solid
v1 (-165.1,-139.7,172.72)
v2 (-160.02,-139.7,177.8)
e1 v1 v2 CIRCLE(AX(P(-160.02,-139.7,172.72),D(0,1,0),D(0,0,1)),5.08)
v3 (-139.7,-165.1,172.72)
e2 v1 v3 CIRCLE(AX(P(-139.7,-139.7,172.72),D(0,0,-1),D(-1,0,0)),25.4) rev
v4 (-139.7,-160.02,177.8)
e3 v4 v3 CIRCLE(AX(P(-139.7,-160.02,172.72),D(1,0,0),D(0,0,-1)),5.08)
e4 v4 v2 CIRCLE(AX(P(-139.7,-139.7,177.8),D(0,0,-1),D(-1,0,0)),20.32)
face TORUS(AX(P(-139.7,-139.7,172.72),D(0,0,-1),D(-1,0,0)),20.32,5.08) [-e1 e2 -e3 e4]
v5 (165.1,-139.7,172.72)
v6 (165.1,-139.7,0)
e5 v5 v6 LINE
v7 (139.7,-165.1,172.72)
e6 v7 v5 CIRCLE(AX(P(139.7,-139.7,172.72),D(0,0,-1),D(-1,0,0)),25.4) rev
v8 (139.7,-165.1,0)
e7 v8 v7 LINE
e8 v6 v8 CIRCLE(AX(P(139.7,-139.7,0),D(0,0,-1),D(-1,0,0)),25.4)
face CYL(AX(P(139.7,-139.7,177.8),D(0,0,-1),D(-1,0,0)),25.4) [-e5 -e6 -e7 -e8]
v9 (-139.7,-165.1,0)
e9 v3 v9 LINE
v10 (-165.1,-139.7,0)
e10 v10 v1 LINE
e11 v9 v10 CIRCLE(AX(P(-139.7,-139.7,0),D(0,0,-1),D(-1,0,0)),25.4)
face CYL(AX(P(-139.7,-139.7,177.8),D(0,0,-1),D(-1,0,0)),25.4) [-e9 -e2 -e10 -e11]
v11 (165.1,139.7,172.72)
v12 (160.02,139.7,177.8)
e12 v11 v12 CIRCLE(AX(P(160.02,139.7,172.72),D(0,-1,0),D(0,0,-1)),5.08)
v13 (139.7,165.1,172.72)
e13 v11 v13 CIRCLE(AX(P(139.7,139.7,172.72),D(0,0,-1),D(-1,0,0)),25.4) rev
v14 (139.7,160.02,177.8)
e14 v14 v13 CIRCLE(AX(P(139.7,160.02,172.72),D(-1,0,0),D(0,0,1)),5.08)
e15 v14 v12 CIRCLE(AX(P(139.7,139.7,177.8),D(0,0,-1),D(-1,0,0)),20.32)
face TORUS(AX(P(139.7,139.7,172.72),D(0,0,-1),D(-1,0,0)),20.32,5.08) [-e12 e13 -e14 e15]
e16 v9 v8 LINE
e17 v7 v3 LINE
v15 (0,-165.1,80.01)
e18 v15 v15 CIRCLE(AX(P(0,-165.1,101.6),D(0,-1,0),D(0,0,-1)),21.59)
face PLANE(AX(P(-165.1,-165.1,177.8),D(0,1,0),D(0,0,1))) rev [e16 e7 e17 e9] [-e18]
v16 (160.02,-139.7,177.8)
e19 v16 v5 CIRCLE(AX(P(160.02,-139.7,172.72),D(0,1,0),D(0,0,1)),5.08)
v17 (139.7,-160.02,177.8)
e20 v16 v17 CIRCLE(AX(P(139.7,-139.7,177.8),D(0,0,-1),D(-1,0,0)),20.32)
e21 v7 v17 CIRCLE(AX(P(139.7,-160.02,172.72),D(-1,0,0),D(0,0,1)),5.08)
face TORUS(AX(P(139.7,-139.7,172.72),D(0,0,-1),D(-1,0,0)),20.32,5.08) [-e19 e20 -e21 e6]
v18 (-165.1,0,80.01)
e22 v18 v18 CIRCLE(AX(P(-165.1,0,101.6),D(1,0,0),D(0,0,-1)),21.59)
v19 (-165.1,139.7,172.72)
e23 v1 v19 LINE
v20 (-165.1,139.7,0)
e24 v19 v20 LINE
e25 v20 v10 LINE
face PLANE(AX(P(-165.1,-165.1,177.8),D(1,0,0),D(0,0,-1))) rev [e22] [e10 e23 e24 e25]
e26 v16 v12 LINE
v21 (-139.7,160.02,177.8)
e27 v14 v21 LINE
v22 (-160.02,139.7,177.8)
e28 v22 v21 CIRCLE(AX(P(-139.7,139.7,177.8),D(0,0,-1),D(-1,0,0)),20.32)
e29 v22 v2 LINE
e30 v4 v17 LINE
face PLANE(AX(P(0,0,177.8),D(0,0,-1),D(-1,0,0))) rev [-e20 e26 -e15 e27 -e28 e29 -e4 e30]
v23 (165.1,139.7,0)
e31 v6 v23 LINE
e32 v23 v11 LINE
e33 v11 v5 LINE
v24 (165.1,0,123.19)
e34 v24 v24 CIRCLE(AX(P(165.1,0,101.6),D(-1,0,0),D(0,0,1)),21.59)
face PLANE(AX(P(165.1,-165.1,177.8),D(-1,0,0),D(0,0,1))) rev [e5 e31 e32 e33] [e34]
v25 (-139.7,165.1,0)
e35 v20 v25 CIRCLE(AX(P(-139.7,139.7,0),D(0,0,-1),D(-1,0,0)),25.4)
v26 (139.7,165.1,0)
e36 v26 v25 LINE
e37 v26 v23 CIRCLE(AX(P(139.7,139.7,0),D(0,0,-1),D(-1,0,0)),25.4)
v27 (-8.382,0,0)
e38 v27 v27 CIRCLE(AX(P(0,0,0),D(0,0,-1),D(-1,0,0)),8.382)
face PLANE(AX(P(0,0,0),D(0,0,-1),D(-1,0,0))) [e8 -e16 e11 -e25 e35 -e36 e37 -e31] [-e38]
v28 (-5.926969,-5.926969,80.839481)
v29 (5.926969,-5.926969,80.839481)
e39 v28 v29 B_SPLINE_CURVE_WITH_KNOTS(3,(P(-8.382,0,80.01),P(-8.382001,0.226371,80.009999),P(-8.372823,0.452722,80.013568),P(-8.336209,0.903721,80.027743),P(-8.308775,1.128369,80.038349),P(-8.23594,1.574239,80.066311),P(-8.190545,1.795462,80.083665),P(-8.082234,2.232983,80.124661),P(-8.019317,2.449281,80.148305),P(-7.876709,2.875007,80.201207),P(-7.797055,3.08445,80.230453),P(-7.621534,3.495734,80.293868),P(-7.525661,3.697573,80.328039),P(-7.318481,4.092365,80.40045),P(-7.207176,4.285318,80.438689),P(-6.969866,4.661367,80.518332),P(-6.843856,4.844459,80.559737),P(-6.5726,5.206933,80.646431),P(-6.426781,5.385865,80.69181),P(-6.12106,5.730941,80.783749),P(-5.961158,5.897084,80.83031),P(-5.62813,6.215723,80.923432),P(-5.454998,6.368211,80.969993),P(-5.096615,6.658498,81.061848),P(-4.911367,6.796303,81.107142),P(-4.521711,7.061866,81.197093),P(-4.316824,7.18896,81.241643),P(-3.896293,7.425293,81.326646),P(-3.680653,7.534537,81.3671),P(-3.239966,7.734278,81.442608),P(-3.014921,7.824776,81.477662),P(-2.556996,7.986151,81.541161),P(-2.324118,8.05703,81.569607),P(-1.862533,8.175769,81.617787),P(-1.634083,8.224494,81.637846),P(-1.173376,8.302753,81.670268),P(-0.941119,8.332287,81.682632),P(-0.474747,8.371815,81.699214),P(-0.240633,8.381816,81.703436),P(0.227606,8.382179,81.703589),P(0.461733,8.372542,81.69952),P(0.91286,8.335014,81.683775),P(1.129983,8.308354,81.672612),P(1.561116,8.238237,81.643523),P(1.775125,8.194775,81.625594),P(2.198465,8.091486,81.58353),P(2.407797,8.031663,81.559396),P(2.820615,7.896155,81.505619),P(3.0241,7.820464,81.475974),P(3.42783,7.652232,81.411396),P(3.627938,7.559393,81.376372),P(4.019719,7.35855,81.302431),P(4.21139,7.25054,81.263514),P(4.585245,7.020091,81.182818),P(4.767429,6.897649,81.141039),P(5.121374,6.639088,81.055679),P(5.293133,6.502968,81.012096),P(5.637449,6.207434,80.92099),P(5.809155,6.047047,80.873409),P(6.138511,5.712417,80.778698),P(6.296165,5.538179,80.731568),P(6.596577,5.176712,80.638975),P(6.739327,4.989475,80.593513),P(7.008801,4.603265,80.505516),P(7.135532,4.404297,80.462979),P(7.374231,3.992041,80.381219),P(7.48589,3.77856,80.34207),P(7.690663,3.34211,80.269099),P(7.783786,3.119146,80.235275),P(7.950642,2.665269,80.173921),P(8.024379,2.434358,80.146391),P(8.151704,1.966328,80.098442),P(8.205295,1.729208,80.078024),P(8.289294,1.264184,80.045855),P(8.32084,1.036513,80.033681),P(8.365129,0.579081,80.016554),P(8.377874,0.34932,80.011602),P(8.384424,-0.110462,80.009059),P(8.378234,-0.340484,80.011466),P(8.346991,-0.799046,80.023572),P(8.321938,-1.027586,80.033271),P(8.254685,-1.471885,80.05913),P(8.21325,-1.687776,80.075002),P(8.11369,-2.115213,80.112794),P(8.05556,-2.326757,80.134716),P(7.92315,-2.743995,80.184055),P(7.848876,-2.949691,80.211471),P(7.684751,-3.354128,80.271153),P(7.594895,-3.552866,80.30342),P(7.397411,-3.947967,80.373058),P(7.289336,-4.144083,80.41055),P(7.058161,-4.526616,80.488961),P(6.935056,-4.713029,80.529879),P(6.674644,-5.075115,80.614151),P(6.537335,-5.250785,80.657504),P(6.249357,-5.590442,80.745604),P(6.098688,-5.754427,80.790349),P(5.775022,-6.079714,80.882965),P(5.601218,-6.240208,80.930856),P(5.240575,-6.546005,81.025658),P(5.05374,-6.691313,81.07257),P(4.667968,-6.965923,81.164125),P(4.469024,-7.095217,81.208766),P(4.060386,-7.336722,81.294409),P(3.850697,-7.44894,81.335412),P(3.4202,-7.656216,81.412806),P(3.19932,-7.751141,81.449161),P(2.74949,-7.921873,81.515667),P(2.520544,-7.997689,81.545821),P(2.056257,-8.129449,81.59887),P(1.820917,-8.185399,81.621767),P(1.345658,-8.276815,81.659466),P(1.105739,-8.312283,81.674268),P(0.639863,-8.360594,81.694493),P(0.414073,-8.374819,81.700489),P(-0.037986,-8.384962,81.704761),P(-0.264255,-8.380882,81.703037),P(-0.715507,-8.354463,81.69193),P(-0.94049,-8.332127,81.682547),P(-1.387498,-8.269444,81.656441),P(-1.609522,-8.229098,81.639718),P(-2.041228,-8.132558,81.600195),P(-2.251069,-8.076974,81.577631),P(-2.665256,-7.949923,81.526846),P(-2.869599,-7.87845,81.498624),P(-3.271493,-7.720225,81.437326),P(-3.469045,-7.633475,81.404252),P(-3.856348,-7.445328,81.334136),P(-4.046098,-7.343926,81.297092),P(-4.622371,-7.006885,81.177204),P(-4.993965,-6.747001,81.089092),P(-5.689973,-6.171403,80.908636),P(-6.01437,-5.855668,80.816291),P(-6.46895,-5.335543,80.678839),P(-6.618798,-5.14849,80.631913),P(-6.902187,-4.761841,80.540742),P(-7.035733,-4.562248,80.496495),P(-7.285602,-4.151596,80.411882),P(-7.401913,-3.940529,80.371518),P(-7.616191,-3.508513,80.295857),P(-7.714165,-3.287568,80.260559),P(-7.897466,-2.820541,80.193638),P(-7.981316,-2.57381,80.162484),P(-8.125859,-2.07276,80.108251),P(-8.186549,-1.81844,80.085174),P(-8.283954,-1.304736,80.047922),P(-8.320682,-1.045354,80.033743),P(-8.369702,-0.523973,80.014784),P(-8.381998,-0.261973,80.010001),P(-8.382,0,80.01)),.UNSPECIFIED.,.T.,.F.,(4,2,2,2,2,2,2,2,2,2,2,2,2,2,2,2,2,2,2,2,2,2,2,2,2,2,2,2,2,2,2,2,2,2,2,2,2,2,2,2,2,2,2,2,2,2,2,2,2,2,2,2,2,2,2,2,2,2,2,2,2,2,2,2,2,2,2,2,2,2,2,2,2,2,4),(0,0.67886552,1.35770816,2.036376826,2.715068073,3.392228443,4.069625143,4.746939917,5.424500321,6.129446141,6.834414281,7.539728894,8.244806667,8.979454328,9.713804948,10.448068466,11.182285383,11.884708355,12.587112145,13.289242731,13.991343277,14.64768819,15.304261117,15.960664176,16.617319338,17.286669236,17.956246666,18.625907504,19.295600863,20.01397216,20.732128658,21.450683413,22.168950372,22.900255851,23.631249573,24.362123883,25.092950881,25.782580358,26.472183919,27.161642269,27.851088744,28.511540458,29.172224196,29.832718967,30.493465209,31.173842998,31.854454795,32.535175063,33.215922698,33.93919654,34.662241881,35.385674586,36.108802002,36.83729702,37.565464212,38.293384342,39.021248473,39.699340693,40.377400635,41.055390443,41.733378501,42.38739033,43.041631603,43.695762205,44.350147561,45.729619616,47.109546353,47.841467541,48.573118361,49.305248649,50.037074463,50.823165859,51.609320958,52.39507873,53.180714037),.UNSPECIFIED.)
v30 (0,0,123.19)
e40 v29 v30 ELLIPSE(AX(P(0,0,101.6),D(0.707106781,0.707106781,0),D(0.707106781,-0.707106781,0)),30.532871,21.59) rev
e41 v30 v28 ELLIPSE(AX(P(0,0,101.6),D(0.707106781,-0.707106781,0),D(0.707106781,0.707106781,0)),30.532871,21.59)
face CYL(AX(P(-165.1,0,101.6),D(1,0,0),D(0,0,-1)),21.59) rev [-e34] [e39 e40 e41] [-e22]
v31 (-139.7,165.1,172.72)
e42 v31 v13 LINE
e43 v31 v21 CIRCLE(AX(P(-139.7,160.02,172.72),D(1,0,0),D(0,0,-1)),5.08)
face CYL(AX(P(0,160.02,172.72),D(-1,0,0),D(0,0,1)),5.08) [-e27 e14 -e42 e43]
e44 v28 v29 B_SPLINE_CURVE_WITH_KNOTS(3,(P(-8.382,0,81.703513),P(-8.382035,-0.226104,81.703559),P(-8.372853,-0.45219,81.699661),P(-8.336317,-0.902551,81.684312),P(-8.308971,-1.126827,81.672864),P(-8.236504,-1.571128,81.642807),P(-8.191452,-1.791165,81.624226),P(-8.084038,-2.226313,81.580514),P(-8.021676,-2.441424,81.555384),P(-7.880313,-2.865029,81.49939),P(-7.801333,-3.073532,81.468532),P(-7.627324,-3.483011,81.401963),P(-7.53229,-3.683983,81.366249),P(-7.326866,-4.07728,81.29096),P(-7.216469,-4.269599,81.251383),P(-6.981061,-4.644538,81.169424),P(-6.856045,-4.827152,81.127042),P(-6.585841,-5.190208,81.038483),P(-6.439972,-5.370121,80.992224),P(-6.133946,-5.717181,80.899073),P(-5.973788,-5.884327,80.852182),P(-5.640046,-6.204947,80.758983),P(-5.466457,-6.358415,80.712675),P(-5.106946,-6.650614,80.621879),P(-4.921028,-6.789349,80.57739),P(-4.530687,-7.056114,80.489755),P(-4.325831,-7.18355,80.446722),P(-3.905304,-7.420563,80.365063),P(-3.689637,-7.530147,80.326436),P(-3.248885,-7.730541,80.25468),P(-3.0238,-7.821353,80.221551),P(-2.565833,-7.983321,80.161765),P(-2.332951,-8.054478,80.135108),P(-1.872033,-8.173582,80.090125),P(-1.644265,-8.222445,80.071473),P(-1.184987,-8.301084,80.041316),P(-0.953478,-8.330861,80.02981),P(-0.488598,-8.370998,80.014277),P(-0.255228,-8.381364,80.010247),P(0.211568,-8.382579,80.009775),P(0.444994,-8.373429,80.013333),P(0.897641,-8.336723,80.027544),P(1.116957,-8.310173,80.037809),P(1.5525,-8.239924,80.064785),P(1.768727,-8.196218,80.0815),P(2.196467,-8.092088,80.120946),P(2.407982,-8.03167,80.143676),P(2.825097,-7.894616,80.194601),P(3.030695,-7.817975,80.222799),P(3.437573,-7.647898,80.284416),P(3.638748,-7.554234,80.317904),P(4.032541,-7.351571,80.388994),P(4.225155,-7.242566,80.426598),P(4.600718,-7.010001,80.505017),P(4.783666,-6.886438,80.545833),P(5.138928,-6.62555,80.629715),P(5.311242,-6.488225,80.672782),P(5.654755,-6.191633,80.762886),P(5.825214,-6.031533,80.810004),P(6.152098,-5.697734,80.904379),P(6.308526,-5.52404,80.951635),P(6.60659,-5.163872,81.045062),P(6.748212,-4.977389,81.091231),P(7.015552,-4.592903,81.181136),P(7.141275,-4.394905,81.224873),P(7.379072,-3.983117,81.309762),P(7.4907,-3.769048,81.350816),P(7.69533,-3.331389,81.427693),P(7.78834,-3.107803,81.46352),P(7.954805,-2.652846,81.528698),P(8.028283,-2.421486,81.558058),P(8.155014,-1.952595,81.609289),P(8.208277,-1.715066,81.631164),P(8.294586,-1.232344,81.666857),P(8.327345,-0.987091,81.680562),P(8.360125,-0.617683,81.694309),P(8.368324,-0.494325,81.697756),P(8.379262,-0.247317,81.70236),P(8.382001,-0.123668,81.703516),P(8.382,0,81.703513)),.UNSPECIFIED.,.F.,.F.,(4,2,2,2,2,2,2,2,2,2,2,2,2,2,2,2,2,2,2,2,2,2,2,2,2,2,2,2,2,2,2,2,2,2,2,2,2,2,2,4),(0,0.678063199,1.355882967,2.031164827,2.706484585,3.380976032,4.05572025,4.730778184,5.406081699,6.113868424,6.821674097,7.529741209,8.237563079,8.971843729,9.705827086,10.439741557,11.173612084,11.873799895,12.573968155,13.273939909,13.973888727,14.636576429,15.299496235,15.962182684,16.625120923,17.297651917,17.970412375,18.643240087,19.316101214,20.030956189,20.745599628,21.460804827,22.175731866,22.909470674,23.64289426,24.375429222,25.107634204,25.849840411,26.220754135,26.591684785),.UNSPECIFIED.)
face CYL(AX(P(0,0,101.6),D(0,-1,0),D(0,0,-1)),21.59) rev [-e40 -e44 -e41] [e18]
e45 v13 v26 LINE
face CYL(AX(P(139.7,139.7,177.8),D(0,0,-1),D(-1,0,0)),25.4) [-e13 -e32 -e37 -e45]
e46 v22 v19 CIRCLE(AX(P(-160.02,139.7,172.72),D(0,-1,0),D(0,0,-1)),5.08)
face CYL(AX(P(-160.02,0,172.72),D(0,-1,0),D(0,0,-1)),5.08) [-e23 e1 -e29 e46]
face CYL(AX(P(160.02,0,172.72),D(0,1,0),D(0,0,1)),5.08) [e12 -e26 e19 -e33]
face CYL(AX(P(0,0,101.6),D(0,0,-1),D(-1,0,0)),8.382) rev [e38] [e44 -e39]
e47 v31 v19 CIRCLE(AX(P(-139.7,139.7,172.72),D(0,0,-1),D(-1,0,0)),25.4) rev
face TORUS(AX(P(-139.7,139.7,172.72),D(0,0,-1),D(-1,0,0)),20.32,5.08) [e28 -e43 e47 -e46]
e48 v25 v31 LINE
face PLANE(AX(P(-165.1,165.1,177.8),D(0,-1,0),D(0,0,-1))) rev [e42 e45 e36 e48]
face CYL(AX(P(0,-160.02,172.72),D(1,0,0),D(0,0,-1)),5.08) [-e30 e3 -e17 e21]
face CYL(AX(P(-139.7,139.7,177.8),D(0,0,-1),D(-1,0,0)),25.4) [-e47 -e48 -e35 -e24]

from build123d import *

# Parameters (mm, degrees)
SKETCH2_W               = 330.2
SKETCH2_H               = 330.2
BOSS_EXTRUDE1_DEPTH     = 177.8
CUT_EXTRUDE1_DEPTH      = 410.759551445
CUT_EXTRUDE1_DEPTH_BACK = 410.759551445
SKETCH3_R               = 21.59
SKETCH5_R               = 8.382
CUT_EXTRUDE3_DEPTH      = 101.6
SKETCH6_R               = 21.59
CUT_EXTRUDE4_DEPTH      = 165.1
FILLET1_R               = 5.08
FILLET2_R               = 25.4


with BuildPart() as part:
    # Sketch2 → Boss-Extrude1 (new body)
    with BuildSketch(Plane.XY):
        Rectangle(SKETCH2_W, SKETCH2_H)
    extrude(amount=BOSS_EXTRUDE1_DEPTH)

    # Sketch3 → Cut-Extrude1 (cut, two sides: drawn at the far end of the back side and taken through both)
    with BuildSketch(Plane(origin=(165.1, 0, 0), x_dir=(0, 0, -1), z_dir=(1, 0, 0)).offset(-CUT_EXTRUDE1_DEPTH_BACK)):
        with Locations((-101.6, 0)):
            Circle(SKETCH3_R)
    extrude(amount=CUT_EXTRUDE1_DEPTH + CUT_EXTRUDE1_DEPTH_BACK, mode=Mode.SUBTRACT)

    # Sketch5 → Cut-Extrude3 (cut)
    with BuildSketch(Plane(origin=(0, 0, 0), x_dir=(-1, 0, 0), z_dir=(0, 0, -1))):
        Circle(SKETCH5_R)
    extrude(amount=-CUT_EXTRUDE3_DEPTH, mode=Mode.SUBTRACT)

    # Sketch6 → Cut-Extrude4 (cut)
    with BuildSketch(Plane.XZ.offset(165.1)):
        with Locations(Location((0, 101.6, 0), (0, 0, 270))):
            Circle(SKETCH6_R)
    extrude(amount=-CUT_EXTRUDE4_DEPTH, mode=Mode.SUBTRACT)

    # Fillet1
    fillet1_edges = [part.edges().sort_by_distance(p)[0] for p in [
        (-165.1, 0, 177.8),
        (0, -165.1, 177.8),
        (165.1, 0, 177.8),
        (0, 165.1, 177.8),
    ]]
    fillet(fillet1_edges, radius=FILLET1_R)

    # Fillet2
    # the kernel refuses this fillet: 25.4 mm, written as the material it takes off along each edge
    with BuildSketch(Plane(origin=(-139.7, 139.7, 177.8), x_dir=(0, 1, 0), z_dir=(1, 0, 0))) as fillet2_piece_1:
        with BuildLine():
            CenterArc((20.32, -5.08), 5.08, 0, 90)
            Line((25.4, -5.08), (25.4, 0))
            Line((25.4, 0), (20.32, 0))
        make_face()
    revolve(axis=Axis((-139.7, 139.7, 177.8), (0, 0, 1)), revolution_arc=90, mode=Mode.SUBTRACT)
    with BuildSketch(Plane(origin=(139.7, 139.7, 177.8), x_dir=(1, 0, 0), z_dir=(0, -1, 0))) as fillet2_piece_2:
        with BuildLine():
            CenterArc((20.32, -5.08), 5.08, 0, 90)
            Line((25.4, -5.08), (25.4, 0))
            Line((25.4, 0), (20.32, 0))
        make_face()
    revolve(axis=Axis((139.7, 139.7, 177.8), (0, 0, 1)), revolution_arc=90, mode=Mode.SUBTRACT)
    with BuildSketch(Plane(origin=(-139.7, -139.7, 177.8), x_dir=(-1, 0, 0), z_dir=(0, 1, 0))) as fillet2_piece_3:
        with BuildLine():
            CenterArc((20.32, -5.08), 5.08, 0, 90)
            Line((25.4, -5.08), (25.4, 0))
            Line((25.4, 0), (20.32, 0))
        make_face()
    revolve(axis=Axis((-139.7, -139.7, 177.8), (0, 0, 1)), revolution_arc=90, mode=Mode.SUBTRACT)
    with BuildSketch(Plane(origin=(139.7, -139.7, 177.8), x_dir=(0, -1, 0), z_dir=(-1, 0, 0))) as fillet2_piece_4:
        with BuildLine():
            CenterArc((20.32, -5.08), 5.08, 0, 90)
            Line((25.4, -5.08), (25.4, 0))
            Line((25.4, 0), (20.32, 0))
        make_face()
    revolve(axis=Axis((139.7, -139.7, 177.8), (0, 0, 1)), revolution_arc=90, mode=Mode.SUBTRACT)
    with BuildSketch(Plane(origin=(165.1, -165.1, -63.5), x_dir=(-1, 0, 0), z_dir=(0, 0, 1)), Plane(origin=(165.1, 165.1, -63.5), x_dir=(0, -1, 0), z_dir=(0, 0, 1))) as fillet2_piece_5:
        with BuildLine():
            CenterArc((FILLET2_R, -FILLET2_R), FILLET2_R, 90, 90)
            Line((0, -FILLET2_R), (0, 0))
            Line((0, 0), (FILLET2_R, 0))
        make_face()
    extrude(amount=241.3, mode=Mode.SUBTRACT)
    with BuildSketch(Plane(origin=(-165.1, -165.1, -63.5), x_dir=(1, 0, 0), z_dir=(0, 0, 1)), Plane(origin=(-165.1, 165.1, -63.5), x_dir=(0, -1, 0), z_dir=(0, 0, 1))) as fillet2_piece_6:
        with BuildLine():
            CenterArc((FILLET2_R, FILLET2_R), FILLET2_R, 180, 90)
            Line((0, FILLET2_R), (0, 0))
            Line((0, 0), (FILLET2_R, 0))
        make_face()
    extrude(amount=241.3, mode=Mode.SUBTRACT)


solid = part.part
